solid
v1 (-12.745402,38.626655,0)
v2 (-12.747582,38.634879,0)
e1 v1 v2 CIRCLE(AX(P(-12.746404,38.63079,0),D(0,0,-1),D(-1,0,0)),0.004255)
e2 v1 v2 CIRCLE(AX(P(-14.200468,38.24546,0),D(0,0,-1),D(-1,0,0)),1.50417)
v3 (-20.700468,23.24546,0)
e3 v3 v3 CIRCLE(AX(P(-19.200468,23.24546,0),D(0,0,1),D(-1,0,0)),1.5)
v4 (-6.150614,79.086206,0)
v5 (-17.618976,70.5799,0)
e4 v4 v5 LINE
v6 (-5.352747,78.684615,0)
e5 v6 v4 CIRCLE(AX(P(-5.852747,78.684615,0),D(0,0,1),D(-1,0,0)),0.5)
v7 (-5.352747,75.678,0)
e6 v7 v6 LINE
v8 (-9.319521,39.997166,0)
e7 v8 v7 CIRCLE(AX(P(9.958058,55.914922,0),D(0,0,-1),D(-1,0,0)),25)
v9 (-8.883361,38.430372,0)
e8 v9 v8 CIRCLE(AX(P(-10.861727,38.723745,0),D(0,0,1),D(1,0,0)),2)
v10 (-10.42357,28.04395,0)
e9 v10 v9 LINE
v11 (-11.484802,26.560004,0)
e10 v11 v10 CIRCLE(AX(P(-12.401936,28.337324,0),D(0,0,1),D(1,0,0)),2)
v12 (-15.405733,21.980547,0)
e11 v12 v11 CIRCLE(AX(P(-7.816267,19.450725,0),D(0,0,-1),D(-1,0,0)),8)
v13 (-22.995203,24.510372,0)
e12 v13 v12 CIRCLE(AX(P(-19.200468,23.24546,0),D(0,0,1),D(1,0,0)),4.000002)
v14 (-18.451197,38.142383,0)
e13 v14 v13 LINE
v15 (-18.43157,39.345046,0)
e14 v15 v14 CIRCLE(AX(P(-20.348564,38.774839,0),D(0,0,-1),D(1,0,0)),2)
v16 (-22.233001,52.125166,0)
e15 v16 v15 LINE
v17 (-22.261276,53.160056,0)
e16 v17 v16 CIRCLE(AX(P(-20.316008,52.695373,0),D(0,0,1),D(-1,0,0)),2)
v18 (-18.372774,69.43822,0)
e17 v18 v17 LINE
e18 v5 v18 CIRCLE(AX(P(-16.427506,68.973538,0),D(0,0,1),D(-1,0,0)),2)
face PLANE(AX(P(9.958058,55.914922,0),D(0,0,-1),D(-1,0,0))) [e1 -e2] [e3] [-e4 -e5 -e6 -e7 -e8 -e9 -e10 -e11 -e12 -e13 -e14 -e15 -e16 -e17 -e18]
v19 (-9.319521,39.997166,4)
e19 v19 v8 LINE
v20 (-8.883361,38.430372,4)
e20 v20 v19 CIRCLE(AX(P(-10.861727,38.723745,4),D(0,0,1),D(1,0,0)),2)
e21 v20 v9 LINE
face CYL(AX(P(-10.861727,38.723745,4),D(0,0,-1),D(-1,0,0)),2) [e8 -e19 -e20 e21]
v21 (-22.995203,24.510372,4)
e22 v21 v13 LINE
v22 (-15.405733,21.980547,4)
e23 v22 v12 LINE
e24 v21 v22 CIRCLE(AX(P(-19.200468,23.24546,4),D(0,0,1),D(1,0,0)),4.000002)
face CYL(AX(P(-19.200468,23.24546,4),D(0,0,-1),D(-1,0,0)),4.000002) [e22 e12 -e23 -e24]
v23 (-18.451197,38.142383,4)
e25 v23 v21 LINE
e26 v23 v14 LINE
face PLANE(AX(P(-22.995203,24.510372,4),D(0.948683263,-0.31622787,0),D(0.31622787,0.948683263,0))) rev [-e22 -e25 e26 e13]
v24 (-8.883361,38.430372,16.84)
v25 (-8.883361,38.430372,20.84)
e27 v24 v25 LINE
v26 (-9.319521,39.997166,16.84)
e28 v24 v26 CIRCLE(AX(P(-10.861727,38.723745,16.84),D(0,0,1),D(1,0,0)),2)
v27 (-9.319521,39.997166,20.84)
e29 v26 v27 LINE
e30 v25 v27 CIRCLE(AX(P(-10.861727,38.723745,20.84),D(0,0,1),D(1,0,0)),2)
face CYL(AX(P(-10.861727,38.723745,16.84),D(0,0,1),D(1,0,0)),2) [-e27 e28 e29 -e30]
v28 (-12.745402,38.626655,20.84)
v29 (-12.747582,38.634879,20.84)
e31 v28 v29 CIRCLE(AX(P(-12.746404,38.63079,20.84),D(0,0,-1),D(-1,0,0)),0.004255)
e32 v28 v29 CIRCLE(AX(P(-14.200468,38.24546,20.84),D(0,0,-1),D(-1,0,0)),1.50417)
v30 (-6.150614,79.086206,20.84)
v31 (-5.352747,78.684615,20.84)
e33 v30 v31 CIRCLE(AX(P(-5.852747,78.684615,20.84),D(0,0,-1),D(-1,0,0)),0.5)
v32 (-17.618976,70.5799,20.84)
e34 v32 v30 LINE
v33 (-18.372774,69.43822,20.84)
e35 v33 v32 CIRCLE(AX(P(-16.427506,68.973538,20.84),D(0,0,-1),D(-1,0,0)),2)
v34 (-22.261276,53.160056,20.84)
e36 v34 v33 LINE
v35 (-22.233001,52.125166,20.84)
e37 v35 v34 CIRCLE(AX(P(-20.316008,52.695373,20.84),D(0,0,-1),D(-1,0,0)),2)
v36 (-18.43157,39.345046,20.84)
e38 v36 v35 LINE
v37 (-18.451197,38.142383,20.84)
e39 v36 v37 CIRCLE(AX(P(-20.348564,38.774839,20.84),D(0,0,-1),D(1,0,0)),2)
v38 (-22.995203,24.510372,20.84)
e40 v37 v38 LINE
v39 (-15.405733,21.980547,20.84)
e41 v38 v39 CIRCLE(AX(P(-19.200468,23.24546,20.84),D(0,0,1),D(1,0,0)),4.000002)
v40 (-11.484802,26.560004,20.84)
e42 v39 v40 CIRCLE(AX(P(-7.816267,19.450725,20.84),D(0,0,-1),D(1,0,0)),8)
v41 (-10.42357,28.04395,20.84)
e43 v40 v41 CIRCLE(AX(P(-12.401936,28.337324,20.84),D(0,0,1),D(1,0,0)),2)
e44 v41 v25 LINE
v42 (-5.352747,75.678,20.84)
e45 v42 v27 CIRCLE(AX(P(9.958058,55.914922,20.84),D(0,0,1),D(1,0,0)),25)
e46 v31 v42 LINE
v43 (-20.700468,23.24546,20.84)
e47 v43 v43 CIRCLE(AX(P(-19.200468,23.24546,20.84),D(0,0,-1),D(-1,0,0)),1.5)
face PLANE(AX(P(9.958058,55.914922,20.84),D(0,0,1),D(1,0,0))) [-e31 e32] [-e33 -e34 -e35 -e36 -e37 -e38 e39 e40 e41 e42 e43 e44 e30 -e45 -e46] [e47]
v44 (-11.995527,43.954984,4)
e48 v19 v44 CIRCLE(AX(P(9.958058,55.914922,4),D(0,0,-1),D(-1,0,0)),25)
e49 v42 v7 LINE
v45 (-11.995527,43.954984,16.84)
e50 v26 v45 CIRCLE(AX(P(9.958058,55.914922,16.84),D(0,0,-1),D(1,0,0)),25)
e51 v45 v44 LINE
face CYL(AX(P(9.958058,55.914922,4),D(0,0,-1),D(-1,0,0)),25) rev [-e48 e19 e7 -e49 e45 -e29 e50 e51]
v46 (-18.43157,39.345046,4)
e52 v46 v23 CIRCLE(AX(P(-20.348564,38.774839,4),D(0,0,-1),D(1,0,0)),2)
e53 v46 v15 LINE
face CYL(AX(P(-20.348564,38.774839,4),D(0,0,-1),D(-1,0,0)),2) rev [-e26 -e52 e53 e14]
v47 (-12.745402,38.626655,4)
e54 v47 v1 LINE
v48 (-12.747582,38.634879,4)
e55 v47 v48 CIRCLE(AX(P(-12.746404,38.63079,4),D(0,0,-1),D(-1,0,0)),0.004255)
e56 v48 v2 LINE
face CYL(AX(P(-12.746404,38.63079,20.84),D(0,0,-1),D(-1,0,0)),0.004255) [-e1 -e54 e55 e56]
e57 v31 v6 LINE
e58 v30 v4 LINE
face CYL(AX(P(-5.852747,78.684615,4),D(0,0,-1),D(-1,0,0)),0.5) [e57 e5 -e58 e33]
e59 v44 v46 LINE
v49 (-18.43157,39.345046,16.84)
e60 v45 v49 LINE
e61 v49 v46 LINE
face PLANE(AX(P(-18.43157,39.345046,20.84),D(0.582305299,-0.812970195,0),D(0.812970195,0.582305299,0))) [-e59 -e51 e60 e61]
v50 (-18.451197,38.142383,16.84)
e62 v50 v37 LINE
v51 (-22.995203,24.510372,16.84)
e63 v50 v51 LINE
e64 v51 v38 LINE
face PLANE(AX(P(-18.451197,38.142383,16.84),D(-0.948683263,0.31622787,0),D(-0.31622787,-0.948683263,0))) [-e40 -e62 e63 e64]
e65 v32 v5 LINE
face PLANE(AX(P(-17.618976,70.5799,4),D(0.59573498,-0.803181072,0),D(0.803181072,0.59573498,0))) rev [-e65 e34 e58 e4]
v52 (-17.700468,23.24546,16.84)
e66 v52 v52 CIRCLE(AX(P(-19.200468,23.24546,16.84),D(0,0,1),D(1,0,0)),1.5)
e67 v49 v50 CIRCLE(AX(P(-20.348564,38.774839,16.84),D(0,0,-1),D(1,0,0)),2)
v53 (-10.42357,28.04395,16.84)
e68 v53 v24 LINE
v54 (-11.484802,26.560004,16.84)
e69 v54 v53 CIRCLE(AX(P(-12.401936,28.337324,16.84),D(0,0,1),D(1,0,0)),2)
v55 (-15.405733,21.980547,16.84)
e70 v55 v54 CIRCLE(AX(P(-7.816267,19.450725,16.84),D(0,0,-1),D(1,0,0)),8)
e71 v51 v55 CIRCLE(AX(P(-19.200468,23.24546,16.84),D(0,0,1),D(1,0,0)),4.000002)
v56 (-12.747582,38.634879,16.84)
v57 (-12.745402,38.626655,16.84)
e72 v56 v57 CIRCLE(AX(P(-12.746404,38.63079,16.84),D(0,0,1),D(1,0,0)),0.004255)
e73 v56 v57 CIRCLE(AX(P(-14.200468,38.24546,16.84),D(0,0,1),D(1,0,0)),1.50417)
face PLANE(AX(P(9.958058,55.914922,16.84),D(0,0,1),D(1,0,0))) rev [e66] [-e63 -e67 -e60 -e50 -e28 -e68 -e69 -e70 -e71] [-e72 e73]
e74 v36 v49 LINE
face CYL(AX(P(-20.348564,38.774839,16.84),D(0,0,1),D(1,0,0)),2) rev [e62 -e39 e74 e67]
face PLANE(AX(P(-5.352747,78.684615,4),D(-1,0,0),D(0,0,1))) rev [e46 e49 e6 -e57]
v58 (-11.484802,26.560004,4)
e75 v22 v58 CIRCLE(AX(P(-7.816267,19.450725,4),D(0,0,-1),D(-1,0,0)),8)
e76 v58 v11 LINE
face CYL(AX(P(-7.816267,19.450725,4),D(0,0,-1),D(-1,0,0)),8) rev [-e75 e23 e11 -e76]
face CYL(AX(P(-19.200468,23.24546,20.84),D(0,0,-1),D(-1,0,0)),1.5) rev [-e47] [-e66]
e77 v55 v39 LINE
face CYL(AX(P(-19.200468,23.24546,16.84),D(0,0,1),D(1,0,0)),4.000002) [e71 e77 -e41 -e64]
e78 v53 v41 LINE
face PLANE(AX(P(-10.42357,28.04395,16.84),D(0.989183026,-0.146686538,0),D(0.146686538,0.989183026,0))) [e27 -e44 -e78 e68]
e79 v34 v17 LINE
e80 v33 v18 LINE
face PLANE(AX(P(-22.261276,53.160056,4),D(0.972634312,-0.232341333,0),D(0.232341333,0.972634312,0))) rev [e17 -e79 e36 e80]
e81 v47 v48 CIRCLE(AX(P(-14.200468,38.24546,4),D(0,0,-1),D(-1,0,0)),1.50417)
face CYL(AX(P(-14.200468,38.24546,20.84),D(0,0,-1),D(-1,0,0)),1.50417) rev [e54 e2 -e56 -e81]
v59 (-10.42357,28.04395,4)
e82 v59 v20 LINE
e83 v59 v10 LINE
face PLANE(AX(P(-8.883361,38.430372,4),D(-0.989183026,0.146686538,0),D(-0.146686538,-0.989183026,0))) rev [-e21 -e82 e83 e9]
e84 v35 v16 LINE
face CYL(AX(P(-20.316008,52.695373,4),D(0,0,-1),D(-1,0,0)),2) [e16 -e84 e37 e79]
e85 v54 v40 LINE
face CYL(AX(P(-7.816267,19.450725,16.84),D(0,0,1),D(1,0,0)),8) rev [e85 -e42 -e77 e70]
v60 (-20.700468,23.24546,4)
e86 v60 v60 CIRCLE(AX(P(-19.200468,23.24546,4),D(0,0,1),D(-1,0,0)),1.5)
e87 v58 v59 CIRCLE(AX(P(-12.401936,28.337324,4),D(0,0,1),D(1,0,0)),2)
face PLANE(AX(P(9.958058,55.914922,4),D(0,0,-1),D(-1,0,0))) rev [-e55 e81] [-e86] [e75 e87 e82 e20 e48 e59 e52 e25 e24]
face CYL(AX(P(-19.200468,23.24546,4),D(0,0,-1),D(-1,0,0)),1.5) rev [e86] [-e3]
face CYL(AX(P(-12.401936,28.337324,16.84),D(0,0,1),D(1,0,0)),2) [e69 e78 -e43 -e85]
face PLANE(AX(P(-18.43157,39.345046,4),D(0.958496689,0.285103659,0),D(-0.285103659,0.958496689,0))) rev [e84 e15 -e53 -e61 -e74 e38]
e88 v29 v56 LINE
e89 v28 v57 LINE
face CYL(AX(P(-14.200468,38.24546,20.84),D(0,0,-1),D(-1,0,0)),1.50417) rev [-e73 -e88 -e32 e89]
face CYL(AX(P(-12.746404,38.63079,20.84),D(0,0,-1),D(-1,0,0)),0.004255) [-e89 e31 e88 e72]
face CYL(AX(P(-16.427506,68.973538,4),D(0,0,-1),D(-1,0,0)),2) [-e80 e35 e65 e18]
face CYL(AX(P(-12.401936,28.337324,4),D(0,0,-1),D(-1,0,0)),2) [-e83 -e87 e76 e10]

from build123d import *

# Parameters (mm, degrees)
SKETCH_1_R          = 1.5
EXTRUDE_1_DEPTH     = 4
EXTRUDE_2_DEPTH     = 20.84
EXTRUDE_START       = -4
EXTRUDE_3_DEPTH     = 4
CUT_EXTRUDE_1_DEPTH = 86.104469456
SKETCH_15_R         = 1.5
CUT_EXTRUDE_2_DEPTH = 86.104469456


with BuildPart() as part:
    # 草图1 → 凸台-拉伸1 (new body)
    with BuildSketch(Plane.XY):
        with BuildLine():
            Line((-8.883361298, 38.430372232), (-10.42356995, 28.043950456))
            ThreePointArc((-10.42356995, 28.043950456), (-10.775128008, 27.17392517), (-11.484802252, 26.560003729))
            ThreePointArc((-11.484802252, 26.560003729), (-13.893149851, 24.653752275), (-15.405733358, 21.980547476))
            ThreePointArc((-15.405733358, 21.980547476), (-20.465380085, 19.450724806), (-22.995202754, 24.510371532))
            Line((-22.995202754, 24.510371532), (-18.451197233, 38.142383115))
            ThreePointArc((-18.451197233, 38.142383115), (-18.348830032, 38.742204214), (-18.431570381, 39.345046174))
            Line((-18.431570381, 39.345046174), (-22.233001172, 52.125165651))
            ThreePointArc((-22.233001172, 52.125165651), (-22.31526172, 52.64074939), (-22.261276417, 53.160055635))
            Line((-22.261276417, 53.160055635), (-18.372774426, 69.438220218))
            ThreePointArc((-18.372774426, 69.438220218), (-18.096529541, 70.075517478), (-17.618975762, 70.579899696))
            Line((-17.618975762, 70.579899696), (-6.150614111, 79.086205979))
            ThreePointArc((-6.150614111, 79.086205979), (-5.627950875, 79.131232586), (-5.352746621, 78.684615443))
            Line((-5.352746621, 78.684615443), (-5.352746621, 75.677999772))
            ThreePointArc((-5.352746621, 75.677999772), (-14.888864346, 58.677248629), (-9.31952103, 39.997165768))
            ThreePointArc((-9.31952103, 39.997165768), (-8.934989705, 39.260105305), (-8.883361298, 38.430372232))
        make_face()
        with Locations((-19.200468056, 23.245459504)):
            Circle(SKETCH_1_R, mode=Mode.SUBTRACT)
        with Locations((-14.200468056, 38.245459504)):
            Circle(SKETCH_1_R, mode=Mode.SUBTRACT)
    extrude(amount=EXTRUDE_1_DEPTH)

    # 草图9 → 凸台-拉伸2 (add)
    with BuildSketch(Plane(origin=(0, 0, 0), x_dir=(-1, 0, 0), z_dir=(0, 0, -1))):
        with BuildLine():
            Line((18.431570381, 39.345046174), (11.995527079, 43.954984078))
            ThreePointArc((11.995527079, 43.954984078), (14.51123125, 61.038775991), (5.352746621, 75.677999772))
            Line((5.352746621, 75.677999772), (5.352746621, 78.684615443))
            ThreePointArc((5.352746621, 78.684615443), (5.627950875, 79.131232586), (6.150614111, 79.086205979))
            Line((6.150614111, 79.086205979), (17.618975762, 70.579899696))
            ThreePointArc((17.618975762, 70.579899696), (18.096529541, 70.075517478), (18.372774426, 69.438220218))
            Line((18.372774426, 69.438220218), (22.261276417, 53.160055635))
            ThreePointArc((22.261276417, 53.160055635), (22.31526172, 52.64074939), (22.233001172, 52.125165651))
            Line((22.233001172, 52.125165651), (18.431570381, 39.345046174))
        make_face()
    extrude(amount=-EXTRUDE_2_DEPTH)

    # 草图13 → 凸台-拉伸3 (add)
    with BuildSketch(Plane.XY.offset(20.84).offset(EXTRUDE_START)):
        with BuildLine():
            Line((-11.995527079, 43.954984078), (-18.431570381, 39.345046174))
            ThreePointArc((-18.431570381, 39.345046174), (-18.348830032, 38.742204214), (-18.451197233, 38.142383115))
            Line((-18.451197233, 38.142383115), (-22.995202754, 24.510371532))
            ThreePointArc((-22.995202754, 24.510371532), (-20.465380085, 19.450724806), (-15.405733358, 21.980547476))
            ThreePointArc((-15.405733358, 21.980547476), (-13.893149851, 24.653752275), (-11.484802252, 26.560003729))
            ThreePointArc((-11.484802252, 26.560003729), (-10.775128008, 27.17392517), (-10.42356995, 28.043950456))
            Line((-10.42356995, 28.043950456), (-8.883361298, 38.430372232))
            ThreePointArc((-8.883361298, 38.430372232), (-8.934989705, 39.260105305), (-9.31952103, 39.997165768))
            ThreePointArc((-9.31952103, 39.997165768), (-10.752284945, 41.91200409), (-11.995527079, 43.954984078))
        make_face()
    extrude(amount=EXTRUDE_3_DEPTH)

    # 草图14 → 切除-拉伸1 (cut, through all)
    with BuildSketch(Plane(origin=(0, 0, 0), x_dir=(-1, 0, 0), z_dir=(0, 0, -1))):
        with BuildLine():
            ThreePointArc((12.747581778, 38.634879176), (12.74980353, 38.633349016), (12.750658691, 38.630790447))
            ThreePointArc((12.750658691, 38.630790447), (12.749034684, 38.627446317), (12.745402307, 38.62665484))
            ThreePointArc((12.745402307, 38.62665484), (14.00829556, 36.753616366), (15.704637667, 38.245459504))
            ThreePointArc((15.704637667, 38.245459504), (14.396859032, 39.736753171), (12.747581778, 38.634879176))
        make_face()
    extrude(amount=-CUT_EXTRUDE_1_DEPTH, mode=Mode.SUBTRACT)

    # 草图15 → 切除-拉伸2 (cut, through all)
    with BuildSketch(Plane(origin=(0, 0, 0), x_dir=(-1, 0, 0), z_dir=(0, 0, -1))):
        with Locations((19.200468056, 23.245459504)):
            Circle(SKETCH_15_R)
    extrude(amount=-CUT_EXTRUDE_2_DEPTH, mode=Mode.SUBTRACT)


solid = part.part
